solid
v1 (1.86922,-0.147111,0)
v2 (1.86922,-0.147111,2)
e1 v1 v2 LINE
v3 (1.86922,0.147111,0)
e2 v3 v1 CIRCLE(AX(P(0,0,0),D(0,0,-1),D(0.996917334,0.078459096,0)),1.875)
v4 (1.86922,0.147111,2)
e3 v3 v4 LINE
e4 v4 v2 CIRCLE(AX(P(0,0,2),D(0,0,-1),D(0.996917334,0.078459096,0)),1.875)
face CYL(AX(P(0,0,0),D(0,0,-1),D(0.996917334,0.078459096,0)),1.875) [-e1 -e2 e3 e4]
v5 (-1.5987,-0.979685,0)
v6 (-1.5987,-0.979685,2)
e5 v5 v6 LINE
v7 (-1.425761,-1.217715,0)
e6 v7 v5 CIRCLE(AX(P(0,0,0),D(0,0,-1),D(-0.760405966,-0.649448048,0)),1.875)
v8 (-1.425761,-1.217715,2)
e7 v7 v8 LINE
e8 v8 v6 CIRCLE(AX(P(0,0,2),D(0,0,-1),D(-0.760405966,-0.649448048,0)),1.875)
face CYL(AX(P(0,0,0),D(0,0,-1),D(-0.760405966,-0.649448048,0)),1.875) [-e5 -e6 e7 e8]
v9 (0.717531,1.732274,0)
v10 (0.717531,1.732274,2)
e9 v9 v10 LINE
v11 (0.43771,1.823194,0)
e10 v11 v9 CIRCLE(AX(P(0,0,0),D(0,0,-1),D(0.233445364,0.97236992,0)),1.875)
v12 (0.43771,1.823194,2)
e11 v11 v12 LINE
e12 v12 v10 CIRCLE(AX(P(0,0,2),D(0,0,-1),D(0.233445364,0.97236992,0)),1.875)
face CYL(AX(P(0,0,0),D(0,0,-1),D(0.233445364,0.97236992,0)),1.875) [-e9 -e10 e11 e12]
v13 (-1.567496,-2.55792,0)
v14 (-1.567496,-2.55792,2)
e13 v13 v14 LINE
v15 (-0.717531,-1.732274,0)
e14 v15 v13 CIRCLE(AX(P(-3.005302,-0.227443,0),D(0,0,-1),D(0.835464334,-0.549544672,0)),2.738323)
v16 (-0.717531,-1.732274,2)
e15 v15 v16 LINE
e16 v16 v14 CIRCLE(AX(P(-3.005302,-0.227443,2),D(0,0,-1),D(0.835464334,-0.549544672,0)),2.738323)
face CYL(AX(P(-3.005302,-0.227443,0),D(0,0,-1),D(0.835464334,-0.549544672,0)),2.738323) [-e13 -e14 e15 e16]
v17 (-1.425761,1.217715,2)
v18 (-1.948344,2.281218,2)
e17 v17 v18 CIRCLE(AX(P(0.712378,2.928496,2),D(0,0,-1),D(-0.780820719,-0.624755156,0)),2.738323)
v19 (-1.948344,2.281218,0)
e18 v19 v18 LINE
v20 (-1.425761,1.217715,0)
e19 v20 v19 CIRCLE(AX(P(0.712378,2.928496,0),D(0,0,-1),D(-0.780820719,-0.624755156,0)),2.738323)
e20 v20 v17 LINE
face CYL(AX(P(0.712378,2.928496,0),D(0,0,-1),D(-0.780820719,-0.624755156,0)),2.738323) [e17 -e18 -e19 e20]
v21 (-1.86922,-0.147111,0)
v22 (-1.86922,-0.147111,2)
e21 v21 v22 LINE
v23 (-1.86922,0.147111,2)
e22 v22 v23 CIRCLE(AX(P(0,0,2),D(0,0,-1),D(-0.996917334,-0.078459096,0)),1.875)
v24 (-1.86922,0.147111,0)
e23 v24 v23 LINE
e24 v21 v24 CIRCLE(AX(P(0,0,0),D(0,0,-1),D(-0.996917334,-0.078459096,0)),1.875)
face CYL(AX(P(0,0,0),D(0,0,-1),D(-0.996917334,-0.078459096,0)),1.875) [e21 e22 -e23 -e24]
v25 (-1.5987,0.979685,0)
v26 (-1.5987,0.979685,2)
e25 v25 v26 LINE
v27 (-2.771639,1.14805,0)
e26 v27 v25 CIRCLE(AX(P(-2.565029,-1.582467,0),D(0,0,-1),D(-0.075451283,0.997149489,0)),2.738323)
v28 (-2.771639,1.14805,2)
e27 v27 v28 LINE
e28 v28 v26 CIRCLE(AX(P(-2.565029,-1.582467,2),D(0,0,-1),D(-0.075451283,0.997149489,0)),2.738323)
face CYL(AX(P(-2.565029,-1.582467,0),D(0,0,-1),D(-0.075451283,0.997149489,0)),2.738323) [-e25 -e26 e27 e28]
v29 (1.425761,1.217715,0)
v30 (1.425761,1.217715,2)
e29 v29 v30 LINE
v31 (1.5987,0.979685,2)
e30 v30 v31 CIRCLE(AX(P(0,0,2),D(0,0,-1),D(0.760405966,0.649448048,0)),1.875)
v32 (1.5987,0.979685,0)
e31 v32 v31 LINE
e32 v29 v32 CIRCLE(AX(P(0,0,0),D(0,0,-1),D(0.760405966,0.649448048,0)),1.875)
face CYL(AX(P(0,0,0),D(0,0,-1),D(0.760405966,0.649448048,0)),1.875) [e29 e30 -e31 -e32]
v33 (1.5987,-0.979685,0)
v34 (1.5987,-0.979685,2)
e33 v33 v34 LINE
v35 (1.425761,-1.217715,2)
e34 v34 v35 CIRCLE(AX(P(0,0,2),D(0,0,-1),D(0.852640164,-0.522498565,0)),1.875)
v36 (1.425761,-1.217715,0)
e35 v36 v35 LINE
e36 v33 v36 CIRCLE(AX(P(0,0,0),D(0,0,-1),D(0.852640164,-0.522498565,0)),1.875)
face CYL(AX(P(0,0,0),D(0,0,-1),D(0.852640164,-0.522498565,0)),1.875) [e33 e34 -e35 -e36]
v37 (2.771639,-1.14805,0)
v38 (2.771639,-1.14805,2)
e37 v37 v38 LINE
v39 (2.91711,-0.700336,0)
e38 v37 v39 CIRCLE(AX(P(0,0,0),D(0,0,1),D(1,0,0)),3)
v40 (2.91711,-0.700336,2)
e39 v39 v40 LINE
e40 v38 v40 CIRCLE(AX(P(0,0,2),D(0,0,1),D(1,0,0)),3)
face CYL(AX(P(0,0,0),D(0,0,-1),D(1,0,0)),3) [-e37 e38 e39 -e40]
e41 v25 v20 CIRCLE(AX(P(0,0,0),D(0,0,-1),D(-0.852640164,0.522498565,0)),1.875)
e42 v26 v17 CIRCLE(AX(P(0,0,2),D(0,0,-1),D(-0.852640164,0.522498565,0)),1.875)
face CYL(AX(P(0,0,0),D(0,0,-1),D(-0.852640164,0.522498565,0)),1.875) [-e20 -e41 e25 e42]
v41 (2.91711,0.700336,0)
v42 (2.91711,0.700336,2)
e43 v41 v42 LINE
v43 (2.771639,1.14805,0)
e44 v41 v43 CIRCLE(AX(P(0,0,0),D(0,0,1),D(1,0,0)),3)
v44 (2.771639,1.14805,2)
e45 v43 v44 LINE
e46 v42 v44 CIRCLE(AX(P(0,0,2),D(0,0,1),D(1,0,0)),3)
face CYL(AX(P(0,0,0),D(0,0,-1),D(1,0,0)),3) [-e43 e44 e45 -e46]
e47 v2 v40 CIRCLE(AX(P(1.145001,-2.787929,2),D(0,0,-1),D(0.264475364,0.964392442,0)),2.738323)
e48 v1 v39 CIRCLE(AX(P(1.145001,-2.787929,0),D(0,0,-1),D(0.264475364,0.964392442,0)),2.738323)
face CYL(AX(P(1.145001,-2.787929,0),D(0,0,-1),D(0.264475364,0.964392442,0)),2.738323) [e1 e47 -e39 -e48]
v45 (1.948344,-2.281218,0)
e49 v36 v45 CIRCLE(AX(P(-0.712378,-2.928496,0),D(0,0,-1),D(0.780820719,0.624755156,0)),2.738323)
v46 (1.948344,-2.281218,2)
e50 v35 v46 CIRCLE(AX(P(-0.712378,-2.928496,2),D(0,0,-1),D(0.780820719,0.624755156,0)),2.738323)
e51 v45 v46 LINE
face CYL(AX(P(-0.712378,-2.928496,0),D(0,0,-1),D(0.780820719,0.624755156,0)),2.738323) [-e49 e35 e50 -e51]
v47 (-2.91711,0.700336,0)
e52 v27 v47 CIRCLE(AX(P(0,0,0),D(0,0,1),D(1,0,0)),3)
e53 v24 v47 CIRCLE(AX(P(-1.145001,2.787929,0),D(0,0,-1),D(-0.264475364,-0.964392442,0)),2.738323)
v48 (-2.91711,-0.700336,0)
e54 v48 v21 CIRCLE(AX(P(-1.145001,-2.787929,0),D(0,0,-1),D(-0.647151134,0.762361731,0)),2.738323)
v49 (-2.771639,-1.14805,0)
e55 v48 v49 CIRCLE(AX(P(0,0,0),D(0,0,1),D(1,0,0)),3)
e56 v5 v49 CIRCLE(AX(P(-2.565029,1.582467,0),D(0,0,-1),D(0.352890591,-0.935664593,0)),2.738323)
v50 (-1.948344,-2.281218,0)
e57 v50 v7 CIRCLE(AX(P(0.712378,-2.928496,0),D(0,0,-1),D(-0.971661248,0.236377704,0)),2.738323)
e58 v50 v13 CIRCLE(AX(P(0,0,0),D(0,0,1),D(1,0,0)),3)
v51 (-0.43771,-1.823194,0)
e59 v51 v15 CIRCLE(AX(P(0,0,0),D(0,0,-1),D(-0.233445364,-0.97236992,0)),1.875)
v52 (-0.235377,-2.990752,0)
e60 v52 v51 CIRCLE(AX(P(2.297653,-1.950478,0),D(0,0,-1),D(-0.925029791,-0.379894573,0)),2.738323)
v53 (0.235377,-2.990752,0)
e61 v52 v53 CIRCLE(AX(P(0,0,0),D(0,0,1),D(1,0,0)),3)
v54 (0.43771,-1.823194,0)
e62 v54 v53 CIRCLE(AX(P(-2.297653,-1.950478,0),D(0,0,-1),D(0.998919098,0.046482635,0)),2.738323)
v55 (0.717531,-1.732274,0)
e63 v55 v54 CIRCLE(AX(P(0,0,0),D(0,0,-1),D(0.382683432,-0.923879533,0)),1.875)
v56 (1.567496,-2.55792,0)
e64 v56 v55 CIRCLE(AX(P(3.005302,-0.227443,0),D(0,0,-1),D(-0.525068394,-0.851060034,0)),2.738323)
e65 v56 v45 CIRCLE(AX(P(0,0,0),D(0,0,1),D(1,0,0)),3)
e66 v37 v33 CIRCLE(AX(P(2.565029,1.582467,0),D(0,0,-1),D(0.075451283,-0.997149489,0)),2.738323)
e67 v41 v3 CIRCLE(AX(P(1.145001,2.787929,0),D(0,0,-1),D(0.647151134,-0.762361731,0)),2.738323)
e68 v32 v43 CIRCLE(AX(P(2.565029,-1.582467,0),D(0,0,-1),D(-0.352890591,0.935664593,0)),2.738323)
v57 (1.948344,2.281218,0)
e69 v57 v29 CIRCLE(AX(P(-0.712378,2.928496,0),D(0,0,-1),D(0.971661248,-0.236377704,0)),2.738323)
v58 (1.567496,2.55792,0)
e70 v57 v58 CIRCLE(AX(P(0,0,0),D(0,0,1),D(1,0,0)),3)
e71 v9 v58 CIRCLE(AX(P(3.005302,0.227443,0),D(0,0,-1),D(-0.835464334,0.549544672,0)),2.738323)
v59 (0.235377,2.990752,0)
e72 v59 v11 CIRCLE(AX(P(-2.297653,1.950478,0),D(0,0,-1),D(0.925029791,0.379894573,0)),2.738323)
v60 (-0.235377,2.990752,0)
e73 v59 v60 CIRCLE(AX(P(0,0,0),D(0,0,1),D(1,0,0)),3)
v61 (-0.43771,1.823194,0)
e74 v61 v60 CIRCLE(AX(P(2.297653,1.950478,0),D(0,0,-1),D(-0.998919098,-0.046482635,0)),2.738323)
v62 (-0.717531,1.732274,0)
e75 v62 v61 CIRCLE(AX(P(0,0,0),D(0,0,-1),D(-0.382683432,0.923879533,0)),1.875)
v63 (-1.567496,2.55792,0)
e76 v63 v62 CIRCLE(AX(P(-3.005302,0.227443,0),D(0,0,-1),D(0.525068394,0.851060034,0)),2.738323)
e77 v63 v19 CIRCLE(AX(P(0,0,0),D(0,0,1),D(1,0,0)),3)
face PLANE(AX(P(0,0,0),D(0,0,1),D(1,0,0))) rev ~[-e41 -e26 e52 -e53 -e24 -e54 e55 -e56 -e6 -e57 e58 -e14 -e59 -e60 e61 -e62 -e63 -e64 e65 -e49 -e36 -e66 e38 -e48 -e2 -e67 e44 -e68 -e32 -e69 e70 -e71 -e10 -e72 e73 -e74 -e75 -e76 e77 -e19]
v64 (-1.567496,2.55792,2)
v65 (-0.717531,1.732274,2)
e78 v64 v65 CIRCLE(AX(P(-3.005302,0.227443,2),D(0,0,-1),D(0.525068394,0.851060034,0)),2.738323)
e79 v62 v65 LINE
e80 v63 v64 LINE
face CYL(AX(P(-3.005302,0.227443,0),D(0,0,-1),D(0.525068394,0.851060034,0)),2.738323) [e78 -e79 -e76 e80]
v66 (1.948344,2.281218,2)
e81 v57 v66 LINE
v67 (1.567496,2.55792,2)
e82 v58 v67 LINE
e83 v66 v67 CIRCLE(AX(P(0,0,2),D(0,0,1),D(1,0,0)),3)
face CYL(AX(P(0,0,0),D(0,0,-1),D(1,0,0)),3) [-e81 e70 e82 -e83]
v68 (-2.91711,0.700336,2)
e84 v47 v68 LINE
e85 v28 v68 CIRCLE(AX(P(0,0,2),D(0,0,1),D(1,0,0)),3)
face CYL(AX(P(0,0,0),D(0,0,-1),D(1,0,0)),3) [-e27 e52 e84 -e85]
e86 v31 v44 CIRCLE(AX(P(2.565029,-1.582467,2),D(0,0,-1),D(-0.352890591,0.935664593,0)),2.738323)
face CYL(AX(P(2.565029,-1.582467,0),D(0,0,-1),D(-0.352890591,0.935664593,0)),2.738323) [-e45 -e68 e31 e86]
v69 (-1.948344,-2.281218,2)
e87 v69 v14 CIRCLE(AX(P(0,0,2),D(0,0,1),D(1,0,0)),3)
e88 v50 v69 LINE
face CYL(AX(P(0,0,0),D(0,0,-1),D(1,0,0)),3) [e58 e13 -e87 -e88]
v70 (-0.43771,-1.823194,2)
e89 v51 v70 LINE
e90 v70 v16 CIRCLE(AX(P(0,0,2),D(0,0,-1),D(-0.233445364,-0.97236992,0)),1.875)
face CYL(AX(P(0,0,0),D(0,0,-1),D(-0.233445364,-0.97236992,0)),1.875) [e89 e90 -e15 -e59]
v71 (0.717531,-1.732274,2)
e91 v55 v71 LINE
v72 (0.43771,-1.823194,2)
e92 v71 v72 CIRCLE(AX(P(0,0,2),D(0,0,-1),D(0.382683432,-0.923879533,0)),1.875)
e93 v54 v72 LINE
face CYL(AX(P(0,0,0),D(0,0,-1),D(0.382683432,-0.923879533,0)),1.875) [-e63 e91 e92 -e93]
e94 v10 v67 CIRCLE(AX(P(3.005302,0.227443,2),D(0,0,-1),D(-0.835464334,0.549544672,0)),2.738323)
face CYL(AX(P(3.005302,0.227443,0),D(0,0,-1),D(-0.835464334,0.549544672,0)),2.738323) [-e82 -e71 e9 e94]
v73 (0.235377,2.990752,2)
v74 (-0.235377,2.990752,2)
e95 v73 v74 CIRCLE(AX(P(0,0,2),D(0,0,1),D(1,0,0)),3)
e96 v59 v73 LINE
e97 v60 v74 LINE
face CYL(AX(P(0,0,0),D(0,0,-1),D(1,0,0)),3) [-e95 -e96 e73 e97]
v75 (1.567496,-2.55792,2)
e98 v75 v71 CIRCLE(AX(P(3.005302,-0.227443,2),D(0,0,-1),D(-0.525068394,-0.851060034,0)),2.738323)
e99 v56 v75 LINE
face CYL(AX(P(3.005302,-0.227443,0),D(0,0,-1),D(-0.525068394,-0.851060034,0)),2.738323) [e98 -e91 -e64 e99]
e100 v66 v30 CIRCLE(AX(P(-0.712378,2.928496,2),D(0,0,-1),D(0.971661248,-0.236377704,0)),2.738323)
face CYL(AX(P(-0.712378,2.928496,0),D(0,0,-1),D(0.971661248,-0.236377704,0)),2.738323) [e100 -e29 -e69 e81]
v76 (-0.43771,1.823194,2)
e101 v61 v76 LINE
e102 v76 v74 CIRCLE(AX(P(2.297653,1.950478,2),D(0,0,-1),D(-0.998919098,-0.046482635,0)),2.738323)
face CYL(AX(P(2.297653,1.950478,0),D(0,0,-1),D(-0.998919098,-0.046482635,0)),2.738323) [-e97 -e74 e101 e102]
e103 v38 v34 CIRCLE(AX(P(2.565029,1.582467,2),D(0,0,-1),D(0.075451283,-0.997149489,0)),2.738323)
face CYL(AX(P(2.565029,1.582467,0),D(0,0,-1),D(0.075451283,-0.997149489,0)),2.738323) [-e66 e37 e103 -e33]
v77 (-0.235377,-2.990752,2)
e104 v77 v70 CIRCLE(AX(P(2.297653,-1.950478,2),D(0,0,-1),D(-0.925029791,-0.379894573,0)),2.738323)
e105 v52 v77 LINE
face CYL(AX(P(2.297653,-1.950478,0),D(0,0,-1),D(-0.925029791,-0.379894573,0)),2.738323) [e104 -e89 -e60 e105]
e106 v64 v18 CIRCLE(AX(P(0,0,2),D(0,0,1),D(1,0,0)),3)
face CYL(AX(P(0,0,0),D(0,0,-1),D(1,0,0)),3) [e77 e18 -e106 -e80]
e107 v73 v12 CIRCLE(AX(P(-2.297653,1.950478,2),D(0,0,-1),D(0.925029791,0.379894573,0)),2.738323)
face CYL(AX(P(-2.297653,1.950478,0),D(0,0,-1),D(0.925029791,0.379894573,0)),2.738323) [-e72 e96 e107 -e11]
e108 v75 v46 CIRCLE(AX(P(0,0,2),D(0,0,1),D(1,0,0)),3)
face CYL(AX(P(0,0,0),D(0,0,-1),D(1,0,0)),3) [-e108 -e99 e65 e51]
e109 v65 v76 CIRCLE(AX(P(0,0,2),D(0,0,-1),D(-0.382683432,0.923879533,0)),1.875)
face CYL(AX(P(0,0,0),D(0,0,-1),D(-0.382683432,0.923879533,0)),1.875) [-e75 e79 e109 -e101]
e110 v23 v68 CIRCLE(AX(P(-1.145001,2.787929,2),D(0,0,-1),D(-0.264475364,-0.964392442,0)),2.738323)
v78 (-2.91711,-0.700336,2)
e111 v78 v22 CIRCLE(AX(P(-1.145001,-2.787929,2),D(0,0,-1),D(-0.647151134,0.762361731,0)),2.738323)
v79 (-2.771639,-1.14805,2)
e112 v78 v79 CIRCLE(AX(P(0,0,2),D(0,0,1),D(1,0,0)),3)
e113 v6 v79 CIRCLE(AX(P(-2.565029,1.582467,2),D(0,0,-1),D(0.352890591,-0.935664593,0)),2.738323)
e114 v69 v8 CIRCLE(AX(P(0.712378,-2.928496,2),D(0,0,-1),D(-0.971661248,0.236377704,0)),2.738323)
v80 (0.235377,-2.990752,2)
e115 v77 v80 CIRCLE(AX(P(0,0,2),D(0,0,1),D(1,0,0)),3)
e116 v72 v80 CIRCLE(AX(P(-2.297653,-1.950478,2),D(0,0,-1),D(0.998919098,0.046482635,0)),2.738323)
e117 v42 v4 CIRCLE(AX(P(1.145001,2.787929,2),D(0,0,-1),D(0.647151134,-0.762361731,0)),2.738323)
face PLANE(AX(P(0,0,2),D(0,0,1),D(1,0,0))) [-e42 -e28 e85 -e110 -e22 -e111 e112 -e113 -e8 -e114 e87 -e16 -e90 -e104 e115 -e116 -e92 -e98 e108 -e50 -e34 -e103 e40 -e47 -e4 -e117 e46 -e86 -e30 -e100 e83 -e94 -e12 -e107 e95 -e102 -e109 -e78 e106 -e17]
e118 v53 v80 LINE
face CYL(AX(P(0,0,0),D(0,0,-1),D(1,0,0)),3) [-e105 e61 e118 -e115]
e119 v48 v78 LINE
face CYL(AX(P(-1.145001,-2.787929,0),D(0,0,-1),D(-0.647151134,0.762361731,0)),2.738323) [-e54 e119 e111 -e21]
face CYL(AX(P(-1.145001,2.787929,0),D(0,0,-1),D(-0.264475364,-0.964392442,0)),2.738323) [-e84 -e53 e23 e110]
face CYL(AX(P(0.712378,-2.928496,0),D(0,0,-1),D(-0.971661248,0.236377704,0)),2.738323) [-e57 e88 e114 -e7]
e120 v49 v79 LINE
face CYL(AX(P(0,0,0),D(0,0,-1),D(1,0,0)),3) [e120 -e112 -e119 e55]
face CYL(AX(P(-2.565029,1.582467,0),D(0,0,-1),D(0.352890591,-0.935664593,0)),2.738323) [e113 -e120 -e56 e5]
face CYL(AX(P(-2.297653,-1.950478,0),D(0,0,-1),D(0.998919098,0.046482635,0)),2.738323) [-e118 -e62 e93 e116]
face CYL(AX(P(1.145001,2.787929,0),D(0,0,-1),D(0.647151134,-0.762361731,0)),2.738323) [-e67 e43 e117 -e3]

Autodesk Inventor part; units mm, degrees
sketch "Sketch1" plane through (0, 0, 0) normal (0, 0, 1) x (1, 0, 0)
  circle A0 centre (0, 0) radius 3
  dimension "d0" = 6
extrude "Extrusion1" add sketch "Sketch1" along normal blind 2
ref_plane "Work Plane2" through (0, 0, 1) normal (0, 0, 1) x (1, 0, 0)
sketch "Sketch2" plane through (0, 0, 0) normal (0, 0, -1) x (-1, 0, 0)
  circle A0 centre (0, 0) radius 3 projected
  circle A1 centre (0, 0) radius 2.5
  dimension "d3" = 5
surface extrude "Flankendurchmesser" sketch "Sketch2" against normal through all shown no curves A1
ref_plane "Work Plane8" through (0, 0, 0) normal (0.9510565, 0.309017, 0) x (0, 0, 1)
ref_plane "Work Plane9" through (0, 0, 0) normal (1, 0, 0) x (0, 1, 0)
spur gear teeth "Stirnzahnrad" teeth 10 pitch diameter 5 tip diameter 6 root diameter 3.75 face width 2 start plane through (0, 0, 0) normal (0, 0, -1) x (-1, 0, 0)
equation "\"d0\" = da_da"
equation "\"d1\" = da_b"
equation "\"d3\" = da_dw"
equation "\"d16\" = da_aw"
equation "\"d43\" = da_aw"
equation "\"d46\" = da_aw"
equation "\"da_da\" = 6"
equation "\"da_b\" = 2"
equation "\"da_dw\" = 5"
equation "\"da_aw\" = 12"
properties part number "Stirnzahnrad1" material "Steel"
